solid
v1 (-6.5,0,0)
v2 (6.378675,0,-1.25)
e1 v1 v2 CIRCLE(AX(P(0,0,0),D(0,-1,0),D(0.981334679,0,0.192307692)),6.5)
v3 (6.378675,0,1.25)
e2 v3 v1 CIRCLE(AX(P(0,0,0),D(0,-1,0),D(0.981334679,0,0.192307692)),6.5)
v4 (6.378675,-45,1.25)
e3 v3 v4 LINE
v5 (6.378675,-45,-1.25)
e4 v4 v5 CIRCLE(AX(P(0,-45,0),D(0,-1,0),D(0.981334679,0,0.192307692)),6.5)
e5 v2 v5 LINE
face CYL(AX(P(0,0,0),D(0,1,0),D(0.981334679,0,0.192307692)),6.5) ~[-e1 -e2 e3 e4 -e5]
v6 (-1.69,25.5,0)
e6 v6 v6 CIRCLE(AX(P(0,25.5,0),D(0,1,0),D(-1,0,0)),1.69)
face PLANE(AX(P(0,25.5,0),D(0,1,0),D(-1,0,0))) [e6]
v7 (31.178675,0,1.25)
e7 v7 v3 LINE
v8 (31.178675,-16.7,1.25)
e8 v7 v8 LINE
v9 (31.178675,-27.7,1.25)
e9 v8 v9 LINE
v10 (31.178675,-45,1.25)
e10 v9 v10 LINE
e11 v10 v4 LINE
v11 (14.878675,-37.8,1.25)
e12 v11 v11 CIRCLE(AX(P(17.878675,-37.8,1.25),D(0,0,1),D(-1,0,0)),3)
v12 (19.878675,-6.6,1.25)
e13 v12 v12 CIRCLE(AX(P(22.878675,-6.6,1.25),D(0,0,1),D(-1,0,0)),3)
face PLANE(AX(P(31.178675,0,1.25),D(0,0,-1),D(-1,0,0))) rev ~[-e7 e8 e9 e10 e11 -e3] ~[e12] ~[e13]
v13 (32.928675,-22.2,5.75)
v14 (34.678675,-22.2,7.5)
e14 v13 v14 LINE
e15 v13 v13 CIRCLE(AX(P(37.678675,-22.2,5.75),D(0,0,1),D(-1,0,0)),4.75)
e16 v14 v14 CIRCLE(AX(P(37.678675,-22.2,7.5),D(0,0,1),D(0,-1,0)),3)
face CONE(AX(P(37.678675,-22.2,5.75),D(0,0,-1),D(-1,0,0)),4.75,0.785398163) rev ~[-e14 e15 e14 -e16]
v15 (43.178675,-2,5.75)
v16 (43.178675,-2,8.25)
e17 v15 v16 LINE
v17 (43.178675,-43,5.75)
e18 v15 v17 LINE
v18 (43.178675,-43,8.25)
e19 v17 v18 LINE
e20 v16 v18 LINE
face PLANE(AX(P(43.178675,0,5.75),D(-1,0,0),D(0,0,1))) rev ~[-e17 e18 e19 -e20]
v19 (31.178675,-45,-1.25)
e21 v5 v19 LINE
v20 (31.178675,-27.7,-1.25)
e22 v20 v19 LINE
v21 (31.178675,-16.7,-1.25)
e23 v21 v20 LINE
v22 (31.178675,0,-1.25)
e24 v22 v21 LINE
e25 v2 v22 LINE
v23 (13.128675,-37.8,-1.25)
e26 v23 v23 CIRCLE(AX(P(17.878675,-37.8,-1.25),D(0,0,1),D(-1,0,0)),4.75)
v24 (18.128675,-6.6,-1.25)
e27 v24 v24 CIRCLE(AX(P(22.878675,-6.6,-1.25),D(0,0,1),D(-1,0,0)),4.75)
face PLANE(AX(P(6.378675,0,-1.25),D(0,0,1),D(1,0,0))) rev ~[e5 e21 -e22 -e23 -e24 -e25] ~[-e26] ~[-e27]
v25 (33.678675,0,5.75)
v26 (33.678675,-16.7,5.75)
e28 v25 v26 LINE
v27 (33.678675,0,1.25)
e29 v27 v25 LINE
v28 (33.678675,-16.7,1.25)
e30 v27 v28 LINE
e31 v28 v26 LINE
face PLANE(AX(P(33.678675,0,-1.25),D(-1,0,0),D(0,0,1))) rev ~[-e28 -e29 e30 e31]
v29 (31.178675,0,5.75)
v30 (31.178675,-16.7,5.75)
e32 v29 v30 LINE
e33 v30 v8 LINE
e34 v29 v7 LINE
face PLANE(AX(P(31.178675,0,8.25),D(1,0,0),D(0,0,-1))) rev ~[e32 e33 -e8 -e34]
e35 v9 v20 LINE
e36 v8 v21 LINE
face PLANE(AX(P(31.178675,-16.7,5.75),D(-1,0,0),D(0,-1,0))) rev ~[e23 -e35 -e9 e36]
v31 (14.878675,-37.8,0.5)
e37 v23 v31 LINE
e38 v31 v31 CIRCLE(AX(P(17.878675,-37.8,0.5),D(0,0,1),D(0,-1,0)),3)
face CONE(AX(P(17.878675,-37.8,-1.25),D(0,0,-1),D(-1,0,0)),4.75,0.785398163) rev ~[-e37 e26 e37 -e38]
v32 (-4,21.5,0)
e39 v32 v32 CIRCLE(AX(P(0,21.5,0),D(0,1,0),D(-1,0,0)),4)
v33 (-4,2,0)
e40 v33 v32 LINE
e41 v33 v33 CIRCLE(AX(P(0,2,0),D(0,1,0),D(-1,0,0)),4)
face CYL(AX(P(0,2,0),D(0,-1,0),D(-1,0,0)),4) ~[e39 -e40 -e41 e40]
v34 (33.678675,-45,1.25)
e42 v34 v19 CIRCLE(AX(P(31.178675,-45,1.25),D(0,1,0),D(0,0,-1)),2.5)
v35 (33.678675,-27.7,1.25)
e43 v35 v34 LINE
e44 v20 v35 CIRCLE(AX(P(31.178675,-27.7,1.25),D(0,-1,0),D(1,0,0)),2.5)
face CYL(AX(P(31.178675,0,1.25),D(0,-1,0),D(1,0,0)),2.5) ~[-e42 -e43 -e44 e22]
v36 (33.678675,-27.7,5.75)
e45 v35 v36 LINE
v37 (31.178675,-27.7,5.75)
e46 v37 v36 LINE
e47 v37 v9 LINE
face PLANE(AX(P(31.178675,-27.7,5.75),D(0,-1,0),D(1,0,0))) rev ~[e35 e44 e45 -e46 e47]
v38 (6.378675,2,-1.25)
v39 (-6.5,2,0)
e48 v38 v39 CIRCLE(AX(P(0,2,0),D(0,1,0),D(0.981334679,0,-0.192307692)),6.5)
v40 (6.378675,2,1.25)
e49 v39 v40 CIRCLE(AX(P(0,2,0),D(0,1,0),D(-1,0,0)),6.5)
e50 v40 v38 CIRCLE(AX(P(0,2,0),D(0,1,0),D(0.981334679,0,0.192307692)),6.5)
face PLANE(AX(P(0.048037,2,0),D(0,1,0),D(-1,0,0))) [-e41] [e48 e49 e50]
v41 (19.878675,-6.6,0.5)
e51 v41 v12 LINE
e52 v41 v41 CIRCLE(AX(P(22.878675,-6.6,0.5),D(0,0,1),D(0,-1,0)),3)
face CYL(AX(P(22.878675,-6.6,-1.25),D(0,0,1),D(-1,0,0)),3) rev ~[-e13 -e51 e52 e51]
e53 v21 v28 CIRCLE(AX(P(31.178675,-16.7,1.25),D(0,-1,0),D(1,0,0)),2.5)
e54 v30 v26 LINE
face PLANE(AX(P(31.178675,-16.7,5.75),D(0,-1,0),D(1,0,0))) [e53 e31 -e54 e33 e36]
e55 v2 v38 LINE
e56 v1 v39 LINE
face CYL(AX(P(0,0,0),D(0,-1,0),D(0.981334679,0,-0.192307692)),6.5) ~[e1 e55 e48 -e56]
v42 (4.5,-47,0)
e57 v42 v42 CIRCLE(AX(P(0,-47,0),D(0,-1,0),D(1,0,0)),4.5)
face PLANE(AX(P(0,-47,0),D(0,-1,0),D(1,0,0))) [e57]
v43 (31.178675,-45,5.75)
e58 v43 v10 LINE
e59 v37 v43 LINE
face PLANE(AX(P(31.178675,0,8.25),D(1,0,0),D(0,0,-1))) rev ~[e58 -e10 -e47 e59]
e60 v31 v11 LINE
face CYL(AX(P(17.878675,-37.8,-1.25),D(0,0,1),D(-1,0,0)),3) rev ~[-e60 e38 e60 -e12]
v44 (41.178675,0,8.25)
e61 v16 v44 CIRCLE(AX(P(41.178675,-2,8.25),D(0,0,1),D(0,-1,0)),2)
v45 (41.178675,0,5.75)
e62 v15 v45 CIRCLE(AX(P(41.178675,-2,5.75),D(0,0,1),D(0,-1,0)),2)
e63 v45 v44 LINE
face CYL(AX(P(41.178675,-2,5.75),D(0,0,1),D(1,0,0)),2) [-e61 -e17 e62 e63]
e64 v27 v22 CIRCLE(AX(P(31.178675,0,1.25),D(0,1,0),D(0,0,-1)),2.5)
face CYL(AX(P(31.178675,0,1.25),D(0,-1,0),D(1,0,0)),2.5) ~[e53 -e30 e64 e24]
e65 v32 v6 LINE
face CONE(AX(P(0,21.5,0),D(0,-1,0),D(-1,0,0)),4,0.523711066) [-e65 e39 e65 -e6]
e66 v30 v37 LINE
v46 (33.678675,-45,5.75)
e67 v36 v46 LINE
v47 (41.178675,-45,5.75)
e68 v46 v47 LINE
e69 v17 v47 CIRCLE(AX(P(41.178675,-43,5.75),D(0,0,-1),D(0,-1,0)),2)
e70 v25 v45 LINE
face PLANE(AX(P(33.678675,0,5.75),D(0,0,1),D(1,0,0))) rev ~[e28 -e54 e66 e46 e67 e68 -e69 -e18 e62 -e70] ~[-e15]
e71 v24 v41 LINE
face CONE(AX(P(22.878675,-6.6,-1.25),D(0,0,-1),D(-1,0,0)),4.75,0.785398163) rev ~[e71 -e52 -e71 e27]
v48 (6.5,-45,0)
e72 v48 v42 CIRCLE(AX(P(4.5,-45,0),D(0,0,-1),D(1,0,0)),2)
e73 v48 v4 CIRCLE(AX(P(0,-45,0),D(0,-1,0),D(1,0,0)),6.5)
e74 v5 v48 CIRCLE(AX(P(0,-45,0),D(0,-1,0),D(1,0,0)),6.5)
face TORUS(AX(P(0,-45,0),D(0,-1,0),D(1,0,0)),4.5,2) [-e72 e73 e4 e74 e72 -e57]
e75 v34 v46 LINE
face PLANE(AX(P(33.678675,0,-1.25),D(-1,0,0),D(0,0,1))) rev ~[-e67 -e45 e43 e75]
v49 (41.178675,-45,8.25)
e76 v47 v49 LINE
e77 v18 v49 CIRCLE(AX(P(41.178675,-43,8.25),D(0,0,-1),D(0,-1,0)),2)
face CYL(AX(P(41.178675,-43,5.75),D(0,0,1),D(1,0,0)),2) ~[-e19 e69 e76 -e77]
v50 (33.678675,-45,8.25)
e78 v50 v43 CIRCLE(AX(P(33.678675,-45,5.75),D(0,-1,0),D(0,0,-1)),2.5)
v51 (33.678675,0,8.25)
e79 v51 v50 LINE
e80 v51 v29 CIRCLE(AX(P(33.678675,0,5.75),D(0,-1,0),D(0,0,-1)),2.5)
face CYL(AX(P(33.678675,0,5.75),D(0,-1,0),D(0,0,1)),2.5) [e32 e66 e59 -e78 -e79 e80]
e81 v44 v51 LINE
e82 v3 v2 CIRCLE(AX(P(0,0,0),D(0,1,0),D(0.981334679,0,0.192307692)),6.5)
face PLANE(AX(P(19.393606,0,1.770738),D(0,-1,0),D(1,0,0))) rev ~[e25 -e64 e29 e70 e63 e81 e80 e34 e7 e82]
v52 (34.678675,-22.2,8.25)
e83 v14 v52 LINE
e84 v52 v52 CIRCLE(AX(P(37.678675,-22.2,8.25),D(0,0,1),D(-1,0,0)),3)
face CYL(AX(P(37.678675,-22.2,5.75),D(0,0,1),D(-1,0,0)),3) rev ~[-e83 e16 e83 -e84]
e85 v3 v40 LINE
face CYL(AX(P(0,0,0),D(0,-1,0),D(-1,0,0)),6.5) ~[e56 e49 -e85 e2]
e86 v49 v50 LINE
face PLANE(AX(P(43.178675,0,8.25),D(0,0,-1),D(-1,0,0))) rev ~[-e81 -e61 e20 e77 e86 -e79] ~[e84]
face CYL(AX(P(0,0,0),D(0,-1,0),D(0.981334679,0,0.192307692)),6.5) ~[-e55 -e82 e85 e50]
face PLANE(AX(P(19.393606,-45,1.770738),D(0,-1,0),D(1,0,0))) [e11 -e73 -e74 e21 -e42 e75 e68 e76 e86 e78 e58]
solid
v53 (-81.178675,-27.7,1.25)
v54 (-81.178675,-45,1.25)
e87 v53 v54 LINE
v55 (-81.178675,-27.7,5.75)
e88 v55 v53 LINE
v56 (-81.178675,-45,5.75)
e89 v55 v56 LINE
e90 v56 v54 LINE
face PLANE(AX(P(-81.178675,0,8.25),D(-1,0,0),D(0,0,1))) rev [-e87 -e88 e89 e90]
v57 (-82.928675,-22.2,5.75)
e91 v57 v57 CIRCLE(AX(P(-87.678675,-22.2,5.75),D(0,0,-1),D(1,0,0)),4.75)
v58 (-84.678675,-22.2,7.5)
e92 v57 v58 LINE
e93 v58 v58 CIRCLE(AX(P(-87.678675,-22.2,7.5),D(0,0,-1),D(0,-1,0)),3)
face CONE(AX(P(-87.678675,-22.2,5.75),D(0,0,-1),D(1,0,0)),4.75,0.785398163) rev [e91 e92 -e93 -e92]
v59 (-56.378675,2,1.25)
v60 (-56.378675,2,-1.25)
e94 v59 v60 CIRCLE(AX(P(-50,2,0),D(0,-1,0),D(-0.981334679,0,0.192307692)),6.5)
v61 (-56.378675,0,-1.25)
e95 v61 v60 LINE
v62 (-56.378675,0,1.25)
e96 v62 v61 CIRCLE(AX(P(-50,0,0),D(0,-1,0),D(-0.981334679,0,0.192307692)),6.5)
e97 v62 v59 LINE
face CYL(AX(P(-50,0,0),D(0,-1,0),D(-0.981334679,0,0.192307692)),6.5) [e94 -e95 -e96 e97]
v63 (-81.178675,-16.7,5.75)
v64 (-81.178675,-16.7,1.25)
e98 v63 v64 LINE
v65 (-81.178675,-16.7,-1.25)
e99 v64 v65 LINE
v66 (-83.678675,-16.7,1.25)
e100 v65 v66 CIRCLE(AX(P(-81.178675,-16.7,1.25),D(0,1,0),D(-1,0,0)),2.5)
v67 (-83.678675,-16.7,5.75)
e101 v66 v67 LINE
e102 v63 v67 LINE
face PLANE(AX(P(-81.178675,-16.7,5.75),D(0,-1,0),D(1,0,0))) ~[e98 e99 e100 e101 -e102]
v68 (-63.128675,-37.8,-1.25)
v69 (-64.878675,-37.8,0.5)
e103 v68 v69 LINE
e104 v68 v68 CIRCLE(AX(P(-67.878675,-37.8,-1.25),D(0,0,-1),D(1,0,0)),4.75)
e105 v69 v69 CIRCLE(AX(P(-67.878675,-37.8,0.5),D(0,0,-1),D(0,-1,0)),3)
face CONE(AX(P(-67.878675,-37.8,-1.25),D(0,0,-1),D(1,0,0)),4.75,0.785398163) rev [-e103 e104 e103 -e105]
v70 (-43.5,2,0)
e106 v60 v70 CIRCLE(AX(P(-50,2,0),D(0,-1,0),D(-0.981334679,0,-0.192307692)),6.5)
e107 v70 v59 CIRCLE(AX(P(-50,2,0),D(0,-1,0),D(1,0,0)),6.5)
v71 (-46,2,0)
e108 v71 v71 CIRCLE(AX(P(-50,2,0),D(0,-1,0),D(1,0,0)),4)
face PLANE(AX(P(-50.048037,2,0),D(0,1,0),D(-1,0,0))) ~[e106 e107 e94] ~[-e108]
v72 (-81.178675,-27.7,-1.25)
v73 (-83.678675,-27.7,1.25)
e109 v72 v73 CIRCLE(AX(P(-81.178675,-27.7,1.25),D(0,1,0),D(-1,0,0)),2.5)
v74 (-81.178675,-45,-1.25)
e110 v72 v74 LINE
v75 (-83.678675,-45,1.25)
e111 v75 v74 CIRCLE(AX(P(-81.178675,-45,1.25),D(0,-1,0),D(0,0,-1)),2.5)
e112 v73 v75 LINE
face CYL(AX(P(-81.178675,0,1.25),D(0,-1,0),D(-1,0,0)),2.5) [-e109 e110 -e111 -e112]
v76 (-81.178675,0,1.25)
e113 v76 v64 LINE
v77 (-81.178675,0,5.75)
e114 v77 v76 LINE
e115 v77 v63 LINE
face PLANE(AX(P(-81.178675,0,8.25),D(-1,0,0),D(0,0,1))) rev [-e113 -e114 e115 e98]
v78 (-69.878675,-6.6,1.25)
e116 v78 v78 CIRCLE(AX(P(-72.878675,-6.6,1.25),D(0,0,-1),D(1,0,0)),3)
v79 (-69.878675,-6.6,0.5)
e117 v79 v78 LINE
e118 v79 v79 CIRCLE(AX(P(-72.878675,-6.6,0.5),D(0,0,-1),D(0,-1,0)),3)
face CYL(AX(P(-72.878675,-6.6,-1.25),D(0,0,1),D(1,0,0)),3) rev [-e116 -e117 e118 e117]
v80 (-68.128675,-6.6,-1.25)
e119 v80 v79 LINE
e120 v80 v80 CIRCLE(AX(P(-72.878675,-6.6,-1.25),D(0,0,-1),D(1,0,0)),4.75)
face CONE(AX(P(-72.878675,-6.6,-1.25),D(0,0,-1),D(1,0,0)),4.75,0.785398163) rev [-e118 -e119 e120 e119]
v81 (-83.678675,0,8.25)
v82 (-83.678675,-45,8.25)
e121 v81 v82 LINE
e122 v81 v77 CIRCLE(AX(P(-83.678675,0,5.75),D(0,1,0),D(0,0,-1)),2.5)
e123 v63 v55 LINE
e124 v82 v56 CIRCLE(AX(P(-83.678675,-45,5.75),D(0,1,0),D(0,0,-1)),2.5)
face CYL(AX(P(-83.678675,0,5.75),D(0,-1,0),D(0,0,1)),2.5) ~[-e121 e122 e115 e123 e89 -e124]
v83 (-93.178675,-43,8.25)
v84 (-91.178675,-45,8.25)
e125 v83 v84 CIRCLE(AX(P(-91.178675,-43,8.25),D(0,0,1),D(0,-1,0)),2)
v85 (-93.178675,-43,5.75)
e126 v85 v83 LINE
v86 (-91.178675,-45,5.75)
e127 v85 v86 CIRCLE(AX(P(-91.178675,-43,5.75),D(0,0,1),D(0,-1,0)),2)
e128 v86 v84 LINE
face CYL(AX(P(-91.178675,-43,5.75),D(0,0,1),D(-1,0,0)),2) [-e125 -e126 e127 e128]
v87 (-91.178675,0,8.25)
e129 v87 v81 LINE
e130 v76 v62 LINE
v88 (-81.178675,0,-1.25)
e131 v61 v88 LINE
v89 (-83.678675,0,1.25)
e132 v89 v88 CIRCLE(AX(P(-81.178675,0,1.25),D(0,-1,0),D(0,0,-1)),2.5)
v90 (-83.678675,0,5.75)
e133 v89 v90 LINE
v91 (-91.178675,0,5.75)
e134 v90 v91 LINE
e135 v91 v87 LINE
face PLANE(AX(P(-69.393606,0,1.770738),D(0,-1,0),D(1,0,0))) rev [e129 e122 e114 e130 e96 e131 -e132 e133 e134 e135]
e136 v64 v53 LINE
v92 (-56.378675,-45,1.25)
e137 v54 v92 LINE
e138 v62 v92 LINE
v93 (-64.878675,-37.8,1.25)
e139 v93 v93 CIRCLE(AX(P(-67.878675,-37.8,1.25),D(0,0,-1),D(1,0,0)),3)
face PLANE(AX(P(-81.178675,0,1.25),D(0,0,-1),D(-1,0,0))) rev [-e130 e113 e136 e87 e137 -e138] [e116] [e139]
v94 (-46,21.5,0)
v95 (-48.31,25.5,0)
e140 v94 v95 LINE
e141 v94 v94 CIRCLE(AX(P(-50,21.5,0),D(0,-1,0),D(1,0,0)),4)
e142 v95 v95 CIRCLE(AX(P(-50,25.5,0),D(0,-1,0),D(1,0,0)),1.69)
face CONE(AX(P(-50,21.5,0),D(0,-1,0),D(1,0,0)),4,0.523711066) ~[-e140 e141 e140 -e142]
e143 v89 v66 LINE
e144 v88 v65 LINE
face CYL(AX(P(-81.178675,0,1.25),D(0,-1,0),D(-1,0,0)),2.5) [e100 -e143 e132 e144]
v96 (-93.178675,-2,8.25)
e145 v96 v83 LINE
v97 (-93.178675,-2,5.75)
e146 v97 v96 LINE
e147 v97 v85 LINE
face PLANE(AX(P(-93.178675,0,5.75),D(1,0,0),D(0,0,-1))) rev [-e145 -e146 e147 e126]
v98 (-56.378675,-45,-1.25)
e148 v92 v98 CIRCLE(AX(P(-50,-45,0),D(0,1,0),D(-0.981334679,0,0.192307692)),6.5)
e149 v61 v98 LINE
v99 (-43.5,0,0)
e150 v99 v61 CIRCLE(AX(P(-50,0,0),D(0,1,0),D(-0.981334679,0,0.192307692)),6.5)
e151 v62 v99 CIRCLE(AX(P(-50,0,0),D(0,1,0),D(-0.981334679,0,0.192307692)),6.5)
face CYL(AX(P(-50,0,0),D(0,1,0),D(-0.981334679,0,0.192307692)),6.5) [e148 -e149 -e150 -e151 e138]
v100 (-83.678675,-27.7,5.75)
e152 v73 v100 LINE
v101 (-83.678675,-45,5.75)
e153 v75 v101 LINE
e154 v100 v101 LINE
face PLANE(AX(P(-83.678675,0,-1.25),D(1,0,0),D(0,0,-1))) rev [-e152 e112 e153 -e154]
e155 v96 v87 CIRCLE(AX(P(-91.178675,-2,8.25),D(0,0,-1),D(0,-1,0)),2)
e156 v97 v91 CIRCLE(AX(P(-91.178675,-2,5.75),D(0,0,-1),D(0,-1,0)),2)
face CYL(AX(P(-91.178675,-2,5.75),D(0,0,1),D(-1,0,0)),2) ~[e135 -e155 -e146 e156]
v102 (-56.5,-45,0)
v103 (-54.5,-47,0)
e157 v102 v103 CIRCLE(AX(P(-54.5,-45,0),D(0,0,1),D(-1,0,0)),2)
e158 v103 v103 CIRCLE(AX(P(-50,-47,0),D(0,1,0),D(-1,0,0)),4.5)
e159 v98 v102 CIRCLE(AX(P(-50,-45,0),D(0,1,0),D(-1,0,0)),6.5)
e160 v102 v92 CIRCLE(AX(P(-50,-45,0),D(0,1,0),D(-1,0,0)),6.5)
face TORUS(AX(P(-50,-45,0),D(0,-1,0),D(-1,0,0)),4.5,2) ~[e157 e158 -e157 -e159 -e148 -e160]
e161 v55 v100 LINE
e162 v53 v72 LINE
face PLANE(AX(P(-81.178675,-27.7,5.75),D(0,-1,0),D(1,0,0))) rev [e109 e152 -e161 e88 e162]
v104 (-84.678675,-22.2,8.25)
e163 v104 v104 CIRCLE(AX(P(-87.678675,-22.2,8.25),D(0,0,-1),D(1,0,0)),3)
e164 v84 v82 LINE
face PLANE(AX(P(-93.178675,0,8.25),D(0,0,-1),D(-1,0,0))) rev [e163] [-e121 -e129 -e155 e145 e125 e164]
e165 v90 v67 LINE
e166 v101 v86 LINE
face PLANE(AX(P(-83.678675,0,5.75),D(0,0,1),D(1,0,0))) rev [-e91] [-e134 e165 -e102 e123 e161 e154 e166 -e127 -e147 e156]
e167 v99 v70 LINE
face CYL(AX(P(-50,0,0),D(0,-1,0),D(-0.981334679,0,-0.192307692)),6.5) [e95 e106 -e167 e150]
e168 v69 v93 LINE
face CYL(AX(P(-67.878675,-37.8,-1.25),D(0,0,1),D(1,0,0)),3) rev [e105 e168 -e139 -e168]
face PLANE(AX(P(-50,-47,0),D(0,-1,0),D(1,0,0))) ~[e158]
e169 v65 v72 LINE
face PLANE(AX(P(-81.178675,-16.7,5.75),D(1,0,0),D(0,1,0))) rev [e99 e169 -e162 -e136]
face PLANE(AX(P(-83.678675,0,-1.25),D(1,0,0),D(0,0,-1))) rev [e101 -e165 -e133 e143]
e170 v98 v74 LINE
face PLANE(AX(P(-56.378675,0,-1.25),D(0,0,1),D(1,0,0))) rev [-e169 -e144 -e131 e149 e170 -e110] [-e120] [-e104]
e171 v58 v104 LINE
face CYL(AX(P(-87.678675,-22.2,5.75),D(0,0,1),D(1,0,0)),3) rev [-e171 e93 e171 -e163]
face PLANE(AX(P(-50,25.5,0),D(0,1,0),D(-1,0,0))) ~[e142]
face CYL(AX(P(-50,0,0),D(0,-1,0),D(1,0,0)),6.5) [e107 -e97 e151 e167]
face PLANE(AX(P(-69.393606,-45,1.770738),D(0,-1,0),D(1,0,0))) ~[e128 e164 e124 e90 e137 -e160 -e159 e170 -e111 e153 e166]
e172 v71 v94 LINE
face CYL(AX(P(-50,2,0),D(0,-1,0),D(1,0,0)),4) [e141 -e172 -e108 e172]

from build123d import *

# Parameters (mm, degrees)
F1_DEPTH        = 45
F2_R            = 2
F3_R            = 2.5
F5_DEPTH        = 2
F6_R            = 4
F7_DEPTH        = 23.5
F8_SIZE2        = 2.31
F8_SIZE         = 4
F10_D           = 6
F10_CSINK_D     = 9.5
F10_CSINK_ANGLE = 90
F11_R           = 6.5
F12_DEPTH       = 2
F14_W           = 5
F14_H           = 11
F15_DEPTH       = 25
F16_D           = 6
F16_CSINK_D     = 9.5
F16_CSINK_ANGLE = 90


# Not quite as in the source:
# - a fillet or chamfer that OpenCascade refuses, or shapes differently, is made with other operations: its cross-section is extruded or revolved along the edge and cut away or added
# - a feature names something its author has since deleted; it is built from what else it names


with BuildPart() as f1:
    # F0 (on Front) → F1 (new body)
    with BuildSketch(Plane.XZ):
        with BuildLine():
            Line((31.1786754111, 1.25), (6.3786754111, 1.25))
            ThreePointArc((6.3786754111, 1.25), (-6.5, 0), (6.3786754111, -1.25))
            Line((6.3786754111, -1.25), (33.6786754111, -1.25))
            Line((33.6786754111, -1.25), (33.6786754111, 5.75))
            Line((33.6786754111, 5.75), (43.1786754111, 5.75))
            Line((43.1786754111, 5.75), (43.1786754111, 8.25))
            Line((43.1786754111, 8.25), (31.1786754111, 8.25))
            Line((31.1786754111, 8.25), (31.1786754111, 1.25))
        make_face()
    extrude(amount=F1_DEPTH)

    # F2
    f2_edges = [f1.edges().sort_by_distance(p)[0] for p in [
        (43.178675, -45, 7),
        (43.178675, 0, 7),
    ]]
    fillet(f2_edges, radius=F2_R)

    # F3
    f3_edges = [f1.edges().sort_by_distance(p)[0] for p in [
        (33.678675, -22.5, -1.25),
        (31.178675, -22.5, 8.25),
    ]]
    fillet(f3_edges, radius=F3_R)

    # F4 (on face) → F5 (join)
    with BuildSketch(Plane(origin=(0, 0, 0), x_dir=(-1, 0, 0), z_dir=(0, 1, 0))):
        with BuildLine():
            ThreePointArc((-6.3786754111, -1.25), (0.6279370303, -6.469597753), (6.5, 0))
            ThreePointArc((6.5, 0), (0.6279370303, 6.469597753), (-6.3786754111, 1.25))
            ThreePointArc((-6.3786754111, 1.25), (-6.5, 0), (-6.3786754111, -1.25))
        make_face()
    extrude(amount=F5_DEPTH)

    # F6 (on face) → F7 (join)
    with BuildSketch(Plane(origin=(0, 2, 0), x_dir=(-1, 0, 0), z_dir=(0, 1, 0))):
        Circle(F6_R)
    extrude(amount=F7_DEPTH)

    # F8
    f8_edges = [f1.edges().sort_by_distance(p)[0] for p in [
        (4, 25.5, 0),
    ]]
    f8_side = f1.faces().sort_by_distance((4, 13.75, 0))[0]
    chamfer(f8_edges, length=F8_SIZE, length2=F8_SIZE2, reference=f8_side)

    # F10 (through all)
    with Locations(Plane(origin=(0, 0, -1.25), x_dir=(1, 0, 0), z_dir=(0, 0, -1))):
        with Locations((22.8786754111, 6.6), (17.8786754111, 37.8)):
            CounterSinkHole(F10_D / 2, F10_CSINK_D / 2, counter_sink_angle=F10_CSINK_ANGLE)

    # F11 (on face) → F12 (join)
    with BuildSketch(Plane.XZ.offset(45)):
        Circle(F11_R)
    extrude(amount=F12_DEPTH)

    # F13: fillet of radius 2 on 1 edges, made by hand

    # F13_s1 → F13_t2 (revolve, cut)
    with BuildSketch(Plane.XY):
        with BuildLine():
            ThreePointArc((6.5, -45), (5.9142135624, -46.4142135624), (4.5, -47))
            Line((4.5, -47), (6.5, -47))
            Line((6.5, -47), (6.5, -45))
        make_face()
    revolve(axis=Axis((0, -47, 0), (0, -1, 0)), mode=Mode.SUBTRACT)

    # F14 (on face) → F15 (cut)
    with BuildSketch(Plane(origin=(0, 0, 5.75), x_dir=(1, 0, 0), z_dir=(0, 0, -1))):
        with Locations((33.6786754111, 22.2)):
            Rectangle(F14_W, F14_H)
    extrude(amount=F15_DEPTH, mode=Mode.SUBTRACT)

    # F16 (through all)
    with Locations(Plane(origin=(0, 0, 5.75), x_dir=(1, 0, 0), z_dir=(0, 0, -1))):
        with Locations((37.6786754111, 22.2)):
            CounterSinkHole(F16_D / 2, F16_CSINK_D / 2, counter_sink_angle=F16_CSINK_ANGLE)


with BuildPart() as f18_1:
    # F18: instance of F1
    add(f1.part.mirror(Plane.YZ.offset(-25)))


solid = Compound([f1.part, f18_1.part])
